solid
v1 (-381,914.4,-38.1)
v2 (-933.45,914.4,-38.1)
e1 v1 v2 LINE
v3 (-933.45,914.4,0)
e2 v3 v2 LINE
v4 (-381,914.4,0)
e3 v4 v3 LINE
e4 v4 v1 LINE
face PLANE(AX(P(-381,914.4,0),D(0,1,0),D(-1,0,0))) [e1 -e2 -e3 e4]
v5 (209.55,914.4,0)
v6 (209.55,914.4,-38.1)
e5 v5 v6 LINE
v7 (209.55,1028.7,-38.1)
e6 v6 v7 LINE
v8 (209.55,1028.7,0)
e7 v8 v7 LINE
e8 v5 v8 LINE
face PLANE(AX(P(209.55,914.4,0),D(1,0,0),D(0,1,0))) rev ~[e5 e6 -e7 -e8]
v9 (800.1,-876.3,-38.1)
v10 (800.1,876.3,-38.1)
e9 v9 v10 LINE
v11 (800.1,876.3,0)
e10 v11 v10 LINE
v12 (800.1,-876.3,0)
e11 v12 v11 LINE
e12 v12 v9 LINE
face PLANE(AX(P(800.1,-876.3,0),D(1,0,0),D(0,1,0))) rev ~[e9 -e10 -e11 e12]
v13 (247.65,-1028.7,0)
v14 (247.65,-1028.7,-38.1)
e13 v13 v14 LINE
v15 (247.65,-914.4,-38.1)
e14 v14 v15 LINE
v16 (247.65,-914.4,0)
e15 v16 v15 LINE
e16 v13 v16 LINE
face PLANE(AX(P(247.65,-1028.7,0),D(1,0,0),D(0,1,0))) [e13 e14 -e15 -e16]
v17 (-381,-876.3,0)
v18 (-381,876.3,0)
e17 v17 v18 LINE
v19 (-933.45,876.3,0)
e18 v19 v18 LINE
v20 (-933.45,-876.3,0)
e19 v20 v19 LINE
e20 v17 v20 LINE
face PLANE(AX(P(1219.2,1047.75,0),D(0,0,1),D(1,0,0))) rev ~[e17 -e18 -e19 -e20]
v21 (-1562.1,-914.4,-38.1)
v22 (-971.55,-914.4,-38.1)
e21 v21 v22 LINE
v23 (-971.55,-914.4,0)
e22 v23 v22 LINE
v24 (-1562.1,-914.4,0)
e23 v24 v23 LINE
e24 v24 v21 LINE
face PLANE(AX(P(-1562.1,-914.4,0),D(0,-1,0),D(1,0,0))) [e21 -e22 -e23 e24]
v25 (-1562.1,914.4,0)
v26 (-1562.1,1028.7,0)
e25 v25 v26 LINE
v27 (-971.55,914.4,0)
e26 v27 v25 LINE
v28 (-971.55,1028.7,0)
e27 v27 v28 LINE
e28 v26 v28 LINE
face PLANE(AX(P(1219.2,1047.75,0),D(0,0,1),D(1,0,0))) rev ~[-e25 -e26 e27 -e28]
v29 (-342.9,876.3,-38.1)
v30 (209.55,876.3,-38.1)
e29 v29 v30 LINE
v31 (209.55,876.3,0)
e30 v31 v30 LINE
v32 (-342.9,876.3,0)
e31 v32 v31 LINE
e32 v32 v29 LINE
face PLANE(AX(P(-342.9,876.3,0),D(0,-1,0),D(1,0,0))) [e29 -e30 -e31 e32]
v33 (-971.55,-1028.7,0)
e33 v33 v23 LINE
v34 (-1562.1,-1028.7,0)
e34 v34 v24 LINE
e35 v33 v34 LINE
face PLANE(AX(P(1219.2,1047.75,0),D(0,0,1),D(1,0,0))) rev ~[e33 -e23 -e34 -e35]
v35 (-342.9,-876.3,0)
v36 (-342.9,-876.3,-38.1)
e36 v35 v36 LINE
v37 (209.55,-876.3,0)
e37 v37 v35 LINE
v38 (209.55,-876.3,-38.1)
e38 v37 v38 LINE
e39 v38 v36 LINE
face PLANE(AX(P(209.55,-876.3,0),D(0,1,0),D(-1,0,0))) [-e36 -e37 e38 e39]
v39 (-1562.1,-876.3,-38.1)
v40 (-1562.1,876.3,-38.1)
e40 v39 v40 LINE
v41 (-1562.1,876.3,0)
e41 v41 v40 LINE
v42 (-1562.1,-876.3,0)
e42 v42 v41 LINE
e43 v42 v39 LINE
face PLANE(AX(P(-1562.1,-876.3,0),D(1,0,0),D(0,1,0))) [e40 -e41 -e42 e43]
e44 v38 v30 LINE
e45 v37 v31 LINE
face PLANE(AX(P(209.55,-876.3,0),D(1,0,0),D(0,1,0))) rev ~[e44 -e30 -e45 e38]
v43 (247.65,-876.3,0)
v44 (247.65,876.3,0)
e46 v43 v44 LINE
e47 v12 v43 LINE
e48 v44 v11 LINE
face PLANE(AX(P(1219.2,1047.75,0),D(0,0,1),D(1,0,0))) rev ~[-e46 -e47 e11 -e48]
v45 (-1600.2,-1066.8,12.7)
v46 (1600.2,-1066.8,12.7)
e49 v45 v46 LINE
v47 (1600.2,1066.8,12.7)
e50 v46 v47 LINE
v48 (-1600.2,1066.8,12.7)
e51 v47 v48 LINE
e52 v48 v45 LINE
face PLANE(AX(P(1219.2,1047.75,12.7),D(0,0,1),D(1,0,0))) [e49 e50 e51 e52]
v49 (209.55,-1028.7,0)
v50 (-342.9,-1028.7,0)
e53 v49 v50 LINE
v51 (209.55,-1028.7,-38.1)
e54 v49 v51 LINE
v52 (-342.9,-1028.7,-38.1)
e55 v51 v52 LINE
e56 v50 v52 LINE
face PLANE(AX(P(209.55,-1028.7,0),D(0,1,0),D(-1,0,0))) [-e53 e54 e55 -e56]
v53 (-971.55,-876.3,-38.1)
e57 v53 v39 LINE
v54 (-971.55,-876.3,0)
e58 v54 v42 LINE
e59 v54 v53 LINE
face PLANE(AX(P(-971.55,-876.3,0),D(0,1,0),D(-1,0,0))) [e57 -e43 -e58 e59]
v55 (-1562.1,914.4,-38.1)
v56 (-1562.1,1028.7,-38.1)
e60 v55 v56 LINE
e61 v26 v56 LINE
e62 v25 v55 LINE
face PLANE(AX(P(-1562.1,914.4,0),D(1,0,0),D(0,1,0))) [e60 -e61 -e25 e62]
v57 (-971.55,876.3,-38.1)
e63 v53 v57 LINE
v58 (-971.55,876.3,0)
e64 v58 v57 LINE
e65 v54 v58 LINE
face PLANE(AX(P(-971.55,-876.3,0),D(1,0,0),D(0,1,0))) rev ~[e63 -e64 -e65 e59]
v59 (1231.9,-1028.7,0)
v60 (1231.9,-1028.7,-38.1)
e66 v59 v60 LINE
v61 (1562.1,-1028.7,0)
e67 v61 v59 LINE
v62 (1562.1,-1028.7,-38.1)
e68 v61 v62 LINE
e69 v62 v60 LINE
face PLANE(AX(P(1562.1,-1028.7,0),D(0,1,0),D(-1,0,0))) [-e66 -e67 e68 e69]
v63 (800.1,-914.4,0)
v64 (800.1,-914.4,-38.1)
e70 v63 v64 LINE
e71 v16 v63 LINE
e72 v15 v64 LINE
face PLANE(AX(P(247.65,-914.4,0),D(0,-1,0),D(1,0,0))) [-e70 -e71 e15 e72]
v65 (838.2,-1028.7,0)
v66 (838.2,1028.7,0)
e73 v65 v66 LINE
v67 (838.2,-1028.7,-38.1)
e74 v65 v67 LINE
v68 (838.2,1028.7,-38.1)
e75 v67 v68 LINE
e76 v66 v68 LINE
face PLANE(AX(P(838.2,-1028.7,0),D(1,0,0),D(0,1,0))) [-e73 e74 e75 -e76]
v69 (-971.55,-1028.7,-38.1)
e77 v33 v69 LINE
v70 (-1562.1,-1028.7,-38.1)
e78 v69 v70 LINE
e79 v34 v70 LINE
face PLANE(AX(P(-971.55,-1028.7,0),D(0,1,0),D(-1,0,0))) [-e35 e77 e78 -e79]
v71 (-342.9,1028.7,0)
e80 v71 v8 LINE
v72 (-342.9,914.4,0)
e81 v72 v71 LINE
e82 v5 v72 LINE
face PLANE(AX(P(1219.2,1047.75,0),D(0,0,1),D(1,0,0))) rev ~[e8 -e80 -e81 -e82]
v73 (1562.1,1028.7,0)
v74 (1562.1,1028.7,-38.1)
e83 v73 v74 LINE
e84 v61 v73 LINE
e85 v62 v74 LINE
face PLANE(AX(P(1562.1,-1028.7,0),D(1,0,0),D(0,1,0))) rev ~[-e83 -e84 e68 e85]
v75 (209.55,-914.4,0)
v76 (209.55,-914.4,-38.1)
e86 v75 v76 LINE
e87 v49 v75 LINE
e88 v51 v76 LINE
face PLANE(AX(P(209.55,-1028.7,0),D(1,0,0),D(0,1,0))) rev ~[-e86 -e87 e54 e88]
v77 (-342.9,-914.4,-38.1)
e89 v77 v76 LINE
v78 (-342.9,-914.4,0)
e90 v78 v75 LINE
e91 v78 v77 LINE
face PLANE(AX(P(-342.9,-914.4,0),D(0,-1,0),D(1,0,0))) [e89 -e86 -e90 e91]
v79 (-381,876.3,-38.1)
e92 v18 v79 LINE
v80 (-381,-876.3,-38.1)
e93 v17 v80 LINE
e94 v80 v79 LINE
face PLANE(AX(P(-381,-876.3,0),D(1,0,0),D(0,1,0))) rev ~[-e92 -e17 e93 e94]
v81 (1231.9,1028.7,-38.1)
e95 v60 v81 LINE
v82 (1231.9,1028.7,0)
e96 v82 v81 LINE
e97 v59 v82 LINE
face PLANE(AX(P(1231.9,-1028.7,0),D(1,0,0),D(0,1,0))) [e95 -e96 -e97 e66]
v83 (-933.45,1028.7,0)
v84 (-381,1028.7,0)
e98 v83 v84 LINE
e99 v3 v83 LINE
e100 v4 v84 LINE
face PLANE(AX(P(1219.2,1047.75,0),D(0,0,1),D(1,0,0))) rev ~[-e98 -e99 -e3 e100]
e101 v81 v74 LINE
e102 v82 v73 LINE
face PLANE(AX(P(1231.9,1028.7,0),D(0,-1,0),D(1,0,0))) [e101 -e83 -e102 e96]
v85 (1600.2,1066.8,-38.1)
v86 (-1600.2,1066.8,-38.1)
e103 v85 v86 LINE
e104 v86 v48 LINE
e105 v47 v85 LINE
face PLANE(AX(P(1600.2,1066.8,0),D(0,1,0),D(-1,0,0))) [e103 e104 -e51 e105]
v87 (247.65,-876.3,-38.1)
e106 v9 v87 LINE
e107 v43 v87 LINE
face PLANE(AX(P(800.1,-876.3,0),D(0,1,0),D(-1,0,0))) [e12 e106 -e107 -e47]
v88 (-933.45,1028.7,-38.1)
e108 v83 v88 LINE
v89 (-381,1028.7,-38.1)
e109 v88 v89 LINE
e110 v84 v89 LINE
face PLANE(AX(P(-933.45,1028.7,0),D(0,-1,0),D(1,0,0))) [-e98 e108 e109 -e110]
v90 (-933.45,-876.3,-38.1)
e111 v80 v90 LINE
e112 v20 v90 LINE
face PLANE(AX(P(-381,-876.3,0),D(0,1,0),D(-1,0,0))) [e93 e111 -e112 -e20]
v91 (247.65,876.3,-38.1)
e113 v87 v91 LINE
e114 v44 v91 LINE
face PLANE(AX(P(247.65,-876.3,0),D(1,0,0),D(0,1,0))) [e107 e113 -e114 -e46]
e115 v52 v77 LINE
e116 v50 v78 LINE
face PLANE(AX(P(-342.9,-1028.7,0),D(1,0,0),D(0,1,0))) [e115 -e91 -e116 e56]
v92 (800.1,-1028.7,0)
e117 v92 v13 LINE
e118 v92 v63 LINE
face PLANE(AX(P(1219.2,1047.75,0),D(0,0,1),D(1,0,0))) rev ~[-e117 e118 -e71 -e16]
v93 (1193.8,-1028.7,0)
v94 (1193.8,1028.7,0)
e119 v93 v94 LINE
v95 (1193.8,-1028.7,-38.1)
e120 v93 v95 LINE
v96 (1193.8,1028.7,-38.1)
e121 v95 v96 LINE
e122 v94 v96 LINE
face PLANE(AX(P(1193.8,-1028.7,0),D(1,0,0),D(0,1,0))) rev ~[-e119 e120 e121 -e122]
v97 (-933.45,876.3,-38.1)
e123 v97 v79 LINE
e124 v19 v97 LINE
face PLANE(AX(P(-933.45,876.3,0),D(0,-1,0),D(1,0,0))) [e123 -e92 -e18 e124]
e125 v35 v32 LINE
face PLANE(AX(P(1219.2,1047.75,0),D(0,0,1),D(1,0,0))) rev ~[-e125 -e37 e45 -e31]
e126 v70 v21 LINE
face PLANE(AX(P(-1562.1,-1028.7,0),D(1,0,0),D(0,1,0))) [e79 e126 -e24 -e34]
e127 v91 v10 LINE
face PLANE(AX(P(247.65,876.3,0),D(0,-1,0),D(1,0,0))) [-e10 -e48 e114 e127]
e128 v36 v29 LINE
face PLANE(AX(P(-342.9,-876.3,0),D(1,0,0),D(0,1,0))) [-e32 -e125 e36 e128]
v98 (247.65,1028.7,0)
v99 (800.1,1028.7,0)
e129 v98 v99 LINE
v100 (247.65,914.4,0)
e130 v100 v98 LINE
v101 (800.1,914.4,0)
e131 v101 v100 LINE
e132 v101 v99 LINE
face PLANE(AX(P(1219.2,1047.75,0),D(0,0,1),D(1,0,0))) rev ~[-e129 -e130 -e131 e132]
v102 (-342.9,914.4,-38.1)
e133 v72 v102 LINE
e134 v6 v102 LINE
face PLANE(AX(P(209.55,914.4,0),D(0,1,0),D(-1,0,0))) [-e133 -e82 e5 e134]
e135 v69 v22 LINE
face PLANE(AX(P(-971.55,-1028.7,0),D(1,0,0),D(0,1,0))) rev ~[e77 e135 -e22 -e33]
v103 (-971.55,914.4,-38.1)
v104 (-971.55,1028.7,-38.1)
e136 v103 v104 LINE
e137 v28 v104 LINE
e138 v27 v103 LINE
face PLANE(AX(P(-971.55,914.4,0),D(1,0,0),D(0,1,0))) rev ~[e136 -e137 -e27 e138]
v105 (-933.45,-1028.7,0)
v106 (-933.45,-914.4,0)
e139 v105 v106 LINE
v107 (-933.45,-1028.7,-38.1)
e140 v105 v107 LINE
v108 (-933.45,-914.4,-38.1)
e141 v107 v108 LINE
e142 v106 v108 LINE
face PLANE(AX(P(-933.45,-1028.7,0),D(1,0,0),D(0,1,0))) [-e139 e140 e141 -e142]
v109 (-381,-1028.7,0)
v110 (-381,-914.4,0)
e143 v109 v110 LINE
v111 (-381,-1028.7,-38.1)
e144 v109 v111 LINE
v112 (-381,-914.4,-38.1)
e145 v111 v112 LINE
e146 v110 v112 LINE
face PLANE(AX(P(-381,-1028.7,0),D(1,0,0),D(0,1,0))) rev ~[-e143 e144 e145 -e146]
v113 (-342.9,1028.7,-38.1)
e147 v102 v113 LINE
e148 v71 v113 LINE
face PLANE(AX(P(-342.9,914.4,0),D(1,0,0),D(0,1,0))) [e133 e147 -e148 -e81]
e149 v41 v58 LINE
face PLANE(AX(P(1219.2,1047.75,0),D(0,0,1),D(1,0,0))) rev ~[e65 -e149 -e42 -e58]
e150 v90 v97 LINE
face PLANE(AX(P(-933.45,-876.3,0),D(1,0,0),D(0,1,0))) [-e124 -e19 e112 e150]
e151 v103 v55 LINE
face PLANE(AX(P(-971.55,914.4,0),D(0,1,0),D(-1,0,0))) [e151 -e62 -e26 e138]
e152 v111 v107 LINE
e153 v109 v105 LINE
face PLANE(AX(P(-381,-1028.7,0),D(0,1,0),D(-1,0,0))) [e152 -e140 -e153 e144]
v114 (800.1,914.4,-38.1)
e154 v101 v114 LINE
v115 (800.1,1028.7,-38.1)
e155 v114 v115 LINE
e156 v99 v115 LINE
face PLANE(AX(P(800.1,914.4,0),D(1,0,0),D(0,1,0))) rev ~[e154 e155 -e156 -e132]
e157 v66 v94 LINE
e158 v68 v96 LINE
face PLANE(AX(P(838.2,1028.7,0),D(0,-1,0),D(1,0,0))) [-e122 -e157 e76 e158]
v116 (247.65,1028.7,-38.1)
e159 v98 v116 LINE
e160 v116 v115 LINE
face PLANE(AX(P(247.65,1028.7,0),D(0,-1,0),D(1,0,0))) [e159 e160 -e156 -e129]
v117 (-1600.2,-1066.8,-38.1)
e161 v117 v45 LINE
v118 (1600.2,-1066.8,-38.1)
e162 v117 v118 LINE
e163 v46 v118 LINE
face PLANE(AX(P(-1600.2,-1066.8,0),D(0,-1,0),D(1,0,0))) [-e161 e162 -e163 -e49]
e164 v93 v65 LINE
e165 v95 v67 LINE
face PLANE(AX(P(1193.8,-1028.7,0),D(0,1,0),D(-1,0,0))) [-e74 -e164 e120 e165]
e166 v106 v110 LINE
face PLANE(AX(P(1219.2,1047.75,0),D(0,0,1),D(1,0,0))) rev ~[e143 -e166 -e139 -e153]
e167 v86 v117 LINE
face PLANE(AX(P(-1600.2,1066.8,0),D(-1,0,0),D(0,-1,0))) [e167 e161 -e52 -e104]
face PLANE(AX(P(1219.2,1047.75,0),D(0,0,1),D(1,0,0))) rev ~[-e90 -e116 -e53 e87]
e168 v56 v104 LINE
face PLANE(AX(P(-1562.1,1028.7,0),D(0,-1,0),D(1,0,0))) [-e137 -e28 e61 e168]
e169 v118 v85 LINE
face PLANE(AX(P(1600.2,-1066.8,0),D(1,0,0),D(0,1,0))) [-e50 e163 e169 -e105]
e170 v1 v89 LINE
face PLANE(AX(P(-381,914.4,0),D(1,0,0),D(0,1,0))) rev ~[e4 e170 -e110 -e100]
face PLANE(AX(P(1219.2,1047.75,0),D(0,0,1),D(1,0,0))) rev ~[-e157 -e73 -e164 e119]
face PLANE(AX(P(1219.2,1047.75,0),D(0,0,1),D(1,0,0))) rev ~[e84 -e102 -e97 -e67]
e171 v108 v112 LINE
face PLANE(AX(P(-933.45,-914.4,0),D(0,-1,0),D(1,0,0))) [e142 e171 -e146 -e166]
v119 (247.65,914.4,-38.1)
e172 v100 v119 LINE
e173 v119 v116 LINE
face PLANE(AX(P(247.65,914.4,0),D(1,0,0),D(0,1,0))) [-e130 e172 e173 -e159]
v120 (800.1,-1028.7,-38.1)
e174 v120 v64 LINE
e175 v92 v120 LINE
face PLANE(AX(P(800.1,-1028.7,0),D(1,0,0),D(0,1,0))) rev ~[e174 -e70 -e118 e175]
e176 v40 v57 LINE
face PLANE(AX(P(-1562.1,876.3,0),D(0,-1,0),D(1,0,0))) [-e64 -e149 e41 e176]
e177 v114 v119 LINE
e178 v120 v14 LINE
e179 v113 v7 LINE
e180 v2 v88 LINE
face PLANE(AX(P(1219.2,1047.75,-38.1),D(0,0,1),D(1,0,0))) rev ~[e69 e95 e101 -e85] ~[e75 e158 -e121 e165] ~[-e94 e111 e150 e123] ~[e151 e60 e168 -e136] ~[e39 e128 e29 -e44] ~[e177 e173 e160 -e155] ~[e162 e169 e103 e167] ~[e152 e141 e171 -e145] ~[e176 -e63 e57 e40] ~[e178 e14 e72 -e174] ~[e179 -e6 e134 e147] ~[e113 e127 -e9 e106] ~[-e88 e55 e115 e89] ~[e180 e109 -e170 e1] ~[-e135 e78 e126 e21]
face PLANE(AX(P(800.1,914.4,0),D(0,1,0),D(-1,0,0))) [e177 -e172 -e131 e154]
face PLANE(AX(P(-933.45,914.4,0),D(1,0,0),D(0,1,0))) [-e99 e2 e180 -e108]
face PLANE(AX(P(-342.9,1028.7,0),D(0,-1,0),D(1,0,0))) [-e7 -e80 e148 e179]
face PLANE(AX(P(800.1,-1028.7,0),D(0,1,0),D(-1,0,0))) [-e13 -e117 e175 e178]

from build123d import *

# Parameters (mm, degrees)
F0_W     = 38.1
F0_H     = 2057.4
F0_H_2   = 114.3
F0_W_2   = 330.2
F0_W_3   = 552.45
F0_H_3   = 1752.6
F0_W_4   = 590.55
F1_DEPTH = 12.7
F2_DEPTH = 38.1


with BuildPart() as f1:
    # F0 (on Top) → F1 (new body)
    with BuildSketch(Plane.XY):
        Polygon((1600.2, 1028.7), (1600.2, 1066.8), (838.2, 1066.8), (838.2, 1028.7), (1193.8, 1028.7), (1231.9, 1028.7), (1562.1, 1028.7), align=None)
        Polygon((838.2, 1028.7), (838.2, 1066.8), (-381, 1066.8), (-1600.2, 1066.8), (-1600.2, 1028.7), (-1562.1, 1028.7), (-971.55, 1028.7), (-933.45, 1028.7), (-381, 1028.7), (-342.9, 1028.7), (209.55, 1028.7), (247.65, 1028.7), (800.1, 1028.7), align=None)
        with Locations((1581.15, 0)):
            Rectangle(F0_W, F0_H)
        Polygon((1193.8, 1028.7), (838.2, 1028.7), (838.2, 914.4), (838.2, 876.3), (838.2, -876.3), (838.2, -914.4), (838.2, -1028.7), (1193.8, -1028.7), align=None)
        with Locations((819.15, 971.55)):
            Rectangle(F0_W, F0_H_2)
        Polygon((1600.2, -1066.8), (1600.2, -1028.7), (1562.1, -1028.7), (1231.9, -1028.7), (1193.8, -1028.7), (838.2, -1028.7), (800.1, -1028.7), (247.65, -1028.7), (209.55, -1028.7), (-342.9, -1028.7), (-381, -1028.7), (-381, -1066.8), align=None)
        with Locations((1397, 0)):
            Rectangle(F0_W_2, F0_H)
        Polygon((838.2, 876.3), (838.2, 914.4), (800.1, 914.4), (247.65, 914.4), (209.55, 914.4), (-342.9, 914.4), (-381, 914.4), (-933.45, 914.4), (-971.55, 914.4), (-1562.1, 914.4), (-1600.2, 914.4), (-1600.2, 876.3), (-1562.1, 876.3), (-971.55, 876.3), (-933.45, 876.3), (-381, 876.3), (-342.9, 876.3), (209.55, 876.3), (247.65, 876.3), (800.1, 876.3), align=None)
        with Locations((523.875, 971.55)):
            Rectangle(F0_W_3, F0_H_2)
        with Locations((1212.85, 0)):
            Rectangle(F0_W, F0_H)
        with Locations((-1581.15, 971.55)):
            Rectangle(F0_W, F0_H_2)
        with Locations((819.15, 0)):
            Rectangle(F0_W, F0_H_3)
        with Locations((228.6, 971.55)):
            Rectangle(F0_W, F0_H_2)
        Polygon((-1600.2, -1066.8), (-381, -1066.8), (-381, -1028.7), (-933.45, -1028.7), (-971.55, -1028.7), (-1562.1, -1028.7), (-1600.2, -1028.7), align=None)
        with Locations((-1266.825, 971.55)):
            Rectangle(F0_W_4, F0_H_2)
        Polygon((838.2, -914.4), (838.2, -876.3), (800.1, -876.3), (247.65, -876.3), (209.55, -876.3), (-342.9, -876.3), (-381, -876.3), (-933.45, -876.3), (-971.55, -876.3), (-1562.1, -876.3), (-1600.2, -876.3), (-1600.2, -914.4), (-1562.1, -914.4), (-971.55, -914.4), (-933.45, -914.4), (-381, -914.4), (-342.9, -914.4), (209.55, -914.4), (247.65, -914.4), (800.1, -914.4), align=None)
        with Locations((523.875, 0)):
            Rectangle(F0_W_3, F0_H_3)
        with Locations((-66.675, 971.55)):
            Rectangle(F0_W_3, F0_H_2)
        with Locations((819.15, -971.55)):
            Rectangle(F0_W, F0_H_2)
        with Locations((-361.95, -971.55)):
            Rectangle(F0_W, F0_H_2)
        with Locations((-657.225, -971.55)):
            Rectangle(F0_W_3, F0_H_2)
        with Locations((-1581.15, 0)):
            Rectangle(F0_W, F0_H_3)
        with Locations((-952.5, 971.55)):
            Rectangle(F0_W, F0_H_2)
        with Locations((228.6, 0)):
            Rectangle(F0_W, F0_H_3)
        with Locations((-361.95, 971.55)):
            Rectangle(F0_W, F0_H_2)
        with Locations((523.875, -971.55)):
            Rectangle(F0_W_3, F0_H_2)
        with Locations((-1581.15, -971.55)):
            Rectangle(F0_W, F0_H_2)
        with Locations((-952.5, -971.55)):
            Rectangle(F0_W, F0_H_2)
        with Locations((-66.675, -971.55)):
            Rectangle(F0_W_3, F0_H_2)
        with Locations((-1266.825, 0)):
            Rectangle(F0_W_4, F0_H_3)
        with Locations((-657.225, 971.55)):
            Rectangle(F0_W_3, F0_H_2)
        with Locations((-66.675, 0)):
            Rectangle(F0_W_3, F0_H_3)
        with Locations((228.6, -971.55)):
            Rectangle(F0_W, F0_H_2)
        with Locations((-1266.825, -971.55)):
            Rectangle(F0_W_4, F0_H_2)
        with Locations((-952.5, 0)):
            Rectangle(F0_W, F0_H_3)
        with Locations((-361.95, 0)):
            Rectangle(F0_W, F0_H_3)
        with Locations((-657.225, 0)):
            Rectangle(F0_W_3, F0_H_3)
    extrude(amount=F1_DEPTH)

    # F0 (on Top) → F2 (join)
    with BuildSketch(Plane.XY):
        Polygon((1600.2, 1028.7), (1600.2, 1066.8), (838.2, 1066.8), (838.2, 1028.7), (1193.8, 1028.7), (1231.9, 1028.7), (1562.1, 1028.7), align=None)
        Polygon((838.2, 1028.7), (838.2, 1066.8), (-381, 1066.8), (-1600.2, 1066.8), (-1600.2, 1028.7), (-1562.1, 1028.7), (-971.55, 1028.7), (-933.45, 1028.7), (-381, 1028.7), (-342.9, 1028.7), (209.55, 1028.7), (247.65, 1028.7), (800.1, 1028.7), align=None)
        with Locations((1581.15, 0)):
            Rectangle(F0_W, F0_H)
        with Locations((819.15, 971.55)):
            Rectangle(F0_W, F0_H_2)
        Polygon((1600.2, -1066.8), (1600.2, -1028.7), (1562.1, -1028.7), (1231.9, -1028.7), (1193.8, -1028.7), (838.2, -1028.7), (800.1, -1028.7), (247.65, -1028.7), (209.55, -1028.7), (-342.9, -1028.7), (-381, -1028.7), (-381, -1066.8), align=None)
        Polygon((838.2, 876.3), (838.2, 914.4), (800.1, 914.4), (247.65, 914.4), (209.55, 914.4), (-342.9, 914.4), (-381, 914.4), (-933.45, 914.4), (-971.55, 914.4), (-1562.1, 914.4), (-1600.2, 914.4), (-1600.2, 876.3), (-1562.1, 876.3), (-971.55, 876.3), (-933.45, 876.3), (-381, 876.3), (-342.9, 876.3), (209.55, 876.3), (247.65, 876.3), (800.1, 876.3), align=None)
        with Locations((1212.85, 0)):
            Rectangle(F0_W, F0_H)
        with Locations((-1581.15, 971.55)):
            Rectangle(F0_W, F0_H_2)
        with Locations((819.15, 0)):
            Rectangle(F0_W, F0_H_3)
        with Locations((228.6, 971.55)):
            Rectangle(F0_W, F0_H_2)
        Polygon((-1600.2, -1066.8), (-381, -1066.8), (-381, -1028.7), (-933.45, -1028.7), (-971.55, -1028.7), (-1562.1, -1028.7), (-1600.2, -1028.7), align=None)
        Polygon((838.2, -914.4), (838.2, -876.3), (800.1, -876.3), (247.65, -876.3), (209.55, -876.3), (-342.9, -876.3), (-381, -876.3), (-933.45, -876.3), (-971.55, -876.3), (-1562.1, -876.3), (-1600.2, -876.3), (-1600.2, -914.4), (-1562.1, -914.4), (-971.55, -914.4), (-933.45, -914.4), (-381, -914.4), (-342.9, -914.4), (209.55, -914.4), (247.65, -914.4), (800.1, -914.4), align=None)
        with Locations((819.15, -971.55)):
            Rectangle(F0_W, F0_H_2)
        with Locations((-361.95, -971.55)):
            Rectangle(F0_W, F0_H_2)
        with Locations((-1581.15, 0)):
            Rectangle(F0_W, F0_H_3)
        with Locations((-952.5, 971.55)):
            Rectangle(F0_W, F0_H_2)
        with Locations((228.6, 0)):
            Rectangle(F0_W, F0_H_3)
        with Locations((-361.95, 971.55)):
            Rectangle(F0_W, F0_H_2)
        with Locations((-1581.15, -971.55)):
            Rectangle(F0_W, F0_H_2)
        with Locations((-952.5, -971.55)):
            Rectangle(F0_W, F0_H_2)
        with Locations((228.6, -971.55)):
            Rectangle(F0_W, F0_H_2)
        with Locations((-952.5, 0)):
            Rectangle(F0_W, F0_H_3)
        with Locations((-361.95, 0)):
            Rectangle(F0_W, F0_H_3)
    extrude(amount=-F2_DEPTH)


solid = f1.part
